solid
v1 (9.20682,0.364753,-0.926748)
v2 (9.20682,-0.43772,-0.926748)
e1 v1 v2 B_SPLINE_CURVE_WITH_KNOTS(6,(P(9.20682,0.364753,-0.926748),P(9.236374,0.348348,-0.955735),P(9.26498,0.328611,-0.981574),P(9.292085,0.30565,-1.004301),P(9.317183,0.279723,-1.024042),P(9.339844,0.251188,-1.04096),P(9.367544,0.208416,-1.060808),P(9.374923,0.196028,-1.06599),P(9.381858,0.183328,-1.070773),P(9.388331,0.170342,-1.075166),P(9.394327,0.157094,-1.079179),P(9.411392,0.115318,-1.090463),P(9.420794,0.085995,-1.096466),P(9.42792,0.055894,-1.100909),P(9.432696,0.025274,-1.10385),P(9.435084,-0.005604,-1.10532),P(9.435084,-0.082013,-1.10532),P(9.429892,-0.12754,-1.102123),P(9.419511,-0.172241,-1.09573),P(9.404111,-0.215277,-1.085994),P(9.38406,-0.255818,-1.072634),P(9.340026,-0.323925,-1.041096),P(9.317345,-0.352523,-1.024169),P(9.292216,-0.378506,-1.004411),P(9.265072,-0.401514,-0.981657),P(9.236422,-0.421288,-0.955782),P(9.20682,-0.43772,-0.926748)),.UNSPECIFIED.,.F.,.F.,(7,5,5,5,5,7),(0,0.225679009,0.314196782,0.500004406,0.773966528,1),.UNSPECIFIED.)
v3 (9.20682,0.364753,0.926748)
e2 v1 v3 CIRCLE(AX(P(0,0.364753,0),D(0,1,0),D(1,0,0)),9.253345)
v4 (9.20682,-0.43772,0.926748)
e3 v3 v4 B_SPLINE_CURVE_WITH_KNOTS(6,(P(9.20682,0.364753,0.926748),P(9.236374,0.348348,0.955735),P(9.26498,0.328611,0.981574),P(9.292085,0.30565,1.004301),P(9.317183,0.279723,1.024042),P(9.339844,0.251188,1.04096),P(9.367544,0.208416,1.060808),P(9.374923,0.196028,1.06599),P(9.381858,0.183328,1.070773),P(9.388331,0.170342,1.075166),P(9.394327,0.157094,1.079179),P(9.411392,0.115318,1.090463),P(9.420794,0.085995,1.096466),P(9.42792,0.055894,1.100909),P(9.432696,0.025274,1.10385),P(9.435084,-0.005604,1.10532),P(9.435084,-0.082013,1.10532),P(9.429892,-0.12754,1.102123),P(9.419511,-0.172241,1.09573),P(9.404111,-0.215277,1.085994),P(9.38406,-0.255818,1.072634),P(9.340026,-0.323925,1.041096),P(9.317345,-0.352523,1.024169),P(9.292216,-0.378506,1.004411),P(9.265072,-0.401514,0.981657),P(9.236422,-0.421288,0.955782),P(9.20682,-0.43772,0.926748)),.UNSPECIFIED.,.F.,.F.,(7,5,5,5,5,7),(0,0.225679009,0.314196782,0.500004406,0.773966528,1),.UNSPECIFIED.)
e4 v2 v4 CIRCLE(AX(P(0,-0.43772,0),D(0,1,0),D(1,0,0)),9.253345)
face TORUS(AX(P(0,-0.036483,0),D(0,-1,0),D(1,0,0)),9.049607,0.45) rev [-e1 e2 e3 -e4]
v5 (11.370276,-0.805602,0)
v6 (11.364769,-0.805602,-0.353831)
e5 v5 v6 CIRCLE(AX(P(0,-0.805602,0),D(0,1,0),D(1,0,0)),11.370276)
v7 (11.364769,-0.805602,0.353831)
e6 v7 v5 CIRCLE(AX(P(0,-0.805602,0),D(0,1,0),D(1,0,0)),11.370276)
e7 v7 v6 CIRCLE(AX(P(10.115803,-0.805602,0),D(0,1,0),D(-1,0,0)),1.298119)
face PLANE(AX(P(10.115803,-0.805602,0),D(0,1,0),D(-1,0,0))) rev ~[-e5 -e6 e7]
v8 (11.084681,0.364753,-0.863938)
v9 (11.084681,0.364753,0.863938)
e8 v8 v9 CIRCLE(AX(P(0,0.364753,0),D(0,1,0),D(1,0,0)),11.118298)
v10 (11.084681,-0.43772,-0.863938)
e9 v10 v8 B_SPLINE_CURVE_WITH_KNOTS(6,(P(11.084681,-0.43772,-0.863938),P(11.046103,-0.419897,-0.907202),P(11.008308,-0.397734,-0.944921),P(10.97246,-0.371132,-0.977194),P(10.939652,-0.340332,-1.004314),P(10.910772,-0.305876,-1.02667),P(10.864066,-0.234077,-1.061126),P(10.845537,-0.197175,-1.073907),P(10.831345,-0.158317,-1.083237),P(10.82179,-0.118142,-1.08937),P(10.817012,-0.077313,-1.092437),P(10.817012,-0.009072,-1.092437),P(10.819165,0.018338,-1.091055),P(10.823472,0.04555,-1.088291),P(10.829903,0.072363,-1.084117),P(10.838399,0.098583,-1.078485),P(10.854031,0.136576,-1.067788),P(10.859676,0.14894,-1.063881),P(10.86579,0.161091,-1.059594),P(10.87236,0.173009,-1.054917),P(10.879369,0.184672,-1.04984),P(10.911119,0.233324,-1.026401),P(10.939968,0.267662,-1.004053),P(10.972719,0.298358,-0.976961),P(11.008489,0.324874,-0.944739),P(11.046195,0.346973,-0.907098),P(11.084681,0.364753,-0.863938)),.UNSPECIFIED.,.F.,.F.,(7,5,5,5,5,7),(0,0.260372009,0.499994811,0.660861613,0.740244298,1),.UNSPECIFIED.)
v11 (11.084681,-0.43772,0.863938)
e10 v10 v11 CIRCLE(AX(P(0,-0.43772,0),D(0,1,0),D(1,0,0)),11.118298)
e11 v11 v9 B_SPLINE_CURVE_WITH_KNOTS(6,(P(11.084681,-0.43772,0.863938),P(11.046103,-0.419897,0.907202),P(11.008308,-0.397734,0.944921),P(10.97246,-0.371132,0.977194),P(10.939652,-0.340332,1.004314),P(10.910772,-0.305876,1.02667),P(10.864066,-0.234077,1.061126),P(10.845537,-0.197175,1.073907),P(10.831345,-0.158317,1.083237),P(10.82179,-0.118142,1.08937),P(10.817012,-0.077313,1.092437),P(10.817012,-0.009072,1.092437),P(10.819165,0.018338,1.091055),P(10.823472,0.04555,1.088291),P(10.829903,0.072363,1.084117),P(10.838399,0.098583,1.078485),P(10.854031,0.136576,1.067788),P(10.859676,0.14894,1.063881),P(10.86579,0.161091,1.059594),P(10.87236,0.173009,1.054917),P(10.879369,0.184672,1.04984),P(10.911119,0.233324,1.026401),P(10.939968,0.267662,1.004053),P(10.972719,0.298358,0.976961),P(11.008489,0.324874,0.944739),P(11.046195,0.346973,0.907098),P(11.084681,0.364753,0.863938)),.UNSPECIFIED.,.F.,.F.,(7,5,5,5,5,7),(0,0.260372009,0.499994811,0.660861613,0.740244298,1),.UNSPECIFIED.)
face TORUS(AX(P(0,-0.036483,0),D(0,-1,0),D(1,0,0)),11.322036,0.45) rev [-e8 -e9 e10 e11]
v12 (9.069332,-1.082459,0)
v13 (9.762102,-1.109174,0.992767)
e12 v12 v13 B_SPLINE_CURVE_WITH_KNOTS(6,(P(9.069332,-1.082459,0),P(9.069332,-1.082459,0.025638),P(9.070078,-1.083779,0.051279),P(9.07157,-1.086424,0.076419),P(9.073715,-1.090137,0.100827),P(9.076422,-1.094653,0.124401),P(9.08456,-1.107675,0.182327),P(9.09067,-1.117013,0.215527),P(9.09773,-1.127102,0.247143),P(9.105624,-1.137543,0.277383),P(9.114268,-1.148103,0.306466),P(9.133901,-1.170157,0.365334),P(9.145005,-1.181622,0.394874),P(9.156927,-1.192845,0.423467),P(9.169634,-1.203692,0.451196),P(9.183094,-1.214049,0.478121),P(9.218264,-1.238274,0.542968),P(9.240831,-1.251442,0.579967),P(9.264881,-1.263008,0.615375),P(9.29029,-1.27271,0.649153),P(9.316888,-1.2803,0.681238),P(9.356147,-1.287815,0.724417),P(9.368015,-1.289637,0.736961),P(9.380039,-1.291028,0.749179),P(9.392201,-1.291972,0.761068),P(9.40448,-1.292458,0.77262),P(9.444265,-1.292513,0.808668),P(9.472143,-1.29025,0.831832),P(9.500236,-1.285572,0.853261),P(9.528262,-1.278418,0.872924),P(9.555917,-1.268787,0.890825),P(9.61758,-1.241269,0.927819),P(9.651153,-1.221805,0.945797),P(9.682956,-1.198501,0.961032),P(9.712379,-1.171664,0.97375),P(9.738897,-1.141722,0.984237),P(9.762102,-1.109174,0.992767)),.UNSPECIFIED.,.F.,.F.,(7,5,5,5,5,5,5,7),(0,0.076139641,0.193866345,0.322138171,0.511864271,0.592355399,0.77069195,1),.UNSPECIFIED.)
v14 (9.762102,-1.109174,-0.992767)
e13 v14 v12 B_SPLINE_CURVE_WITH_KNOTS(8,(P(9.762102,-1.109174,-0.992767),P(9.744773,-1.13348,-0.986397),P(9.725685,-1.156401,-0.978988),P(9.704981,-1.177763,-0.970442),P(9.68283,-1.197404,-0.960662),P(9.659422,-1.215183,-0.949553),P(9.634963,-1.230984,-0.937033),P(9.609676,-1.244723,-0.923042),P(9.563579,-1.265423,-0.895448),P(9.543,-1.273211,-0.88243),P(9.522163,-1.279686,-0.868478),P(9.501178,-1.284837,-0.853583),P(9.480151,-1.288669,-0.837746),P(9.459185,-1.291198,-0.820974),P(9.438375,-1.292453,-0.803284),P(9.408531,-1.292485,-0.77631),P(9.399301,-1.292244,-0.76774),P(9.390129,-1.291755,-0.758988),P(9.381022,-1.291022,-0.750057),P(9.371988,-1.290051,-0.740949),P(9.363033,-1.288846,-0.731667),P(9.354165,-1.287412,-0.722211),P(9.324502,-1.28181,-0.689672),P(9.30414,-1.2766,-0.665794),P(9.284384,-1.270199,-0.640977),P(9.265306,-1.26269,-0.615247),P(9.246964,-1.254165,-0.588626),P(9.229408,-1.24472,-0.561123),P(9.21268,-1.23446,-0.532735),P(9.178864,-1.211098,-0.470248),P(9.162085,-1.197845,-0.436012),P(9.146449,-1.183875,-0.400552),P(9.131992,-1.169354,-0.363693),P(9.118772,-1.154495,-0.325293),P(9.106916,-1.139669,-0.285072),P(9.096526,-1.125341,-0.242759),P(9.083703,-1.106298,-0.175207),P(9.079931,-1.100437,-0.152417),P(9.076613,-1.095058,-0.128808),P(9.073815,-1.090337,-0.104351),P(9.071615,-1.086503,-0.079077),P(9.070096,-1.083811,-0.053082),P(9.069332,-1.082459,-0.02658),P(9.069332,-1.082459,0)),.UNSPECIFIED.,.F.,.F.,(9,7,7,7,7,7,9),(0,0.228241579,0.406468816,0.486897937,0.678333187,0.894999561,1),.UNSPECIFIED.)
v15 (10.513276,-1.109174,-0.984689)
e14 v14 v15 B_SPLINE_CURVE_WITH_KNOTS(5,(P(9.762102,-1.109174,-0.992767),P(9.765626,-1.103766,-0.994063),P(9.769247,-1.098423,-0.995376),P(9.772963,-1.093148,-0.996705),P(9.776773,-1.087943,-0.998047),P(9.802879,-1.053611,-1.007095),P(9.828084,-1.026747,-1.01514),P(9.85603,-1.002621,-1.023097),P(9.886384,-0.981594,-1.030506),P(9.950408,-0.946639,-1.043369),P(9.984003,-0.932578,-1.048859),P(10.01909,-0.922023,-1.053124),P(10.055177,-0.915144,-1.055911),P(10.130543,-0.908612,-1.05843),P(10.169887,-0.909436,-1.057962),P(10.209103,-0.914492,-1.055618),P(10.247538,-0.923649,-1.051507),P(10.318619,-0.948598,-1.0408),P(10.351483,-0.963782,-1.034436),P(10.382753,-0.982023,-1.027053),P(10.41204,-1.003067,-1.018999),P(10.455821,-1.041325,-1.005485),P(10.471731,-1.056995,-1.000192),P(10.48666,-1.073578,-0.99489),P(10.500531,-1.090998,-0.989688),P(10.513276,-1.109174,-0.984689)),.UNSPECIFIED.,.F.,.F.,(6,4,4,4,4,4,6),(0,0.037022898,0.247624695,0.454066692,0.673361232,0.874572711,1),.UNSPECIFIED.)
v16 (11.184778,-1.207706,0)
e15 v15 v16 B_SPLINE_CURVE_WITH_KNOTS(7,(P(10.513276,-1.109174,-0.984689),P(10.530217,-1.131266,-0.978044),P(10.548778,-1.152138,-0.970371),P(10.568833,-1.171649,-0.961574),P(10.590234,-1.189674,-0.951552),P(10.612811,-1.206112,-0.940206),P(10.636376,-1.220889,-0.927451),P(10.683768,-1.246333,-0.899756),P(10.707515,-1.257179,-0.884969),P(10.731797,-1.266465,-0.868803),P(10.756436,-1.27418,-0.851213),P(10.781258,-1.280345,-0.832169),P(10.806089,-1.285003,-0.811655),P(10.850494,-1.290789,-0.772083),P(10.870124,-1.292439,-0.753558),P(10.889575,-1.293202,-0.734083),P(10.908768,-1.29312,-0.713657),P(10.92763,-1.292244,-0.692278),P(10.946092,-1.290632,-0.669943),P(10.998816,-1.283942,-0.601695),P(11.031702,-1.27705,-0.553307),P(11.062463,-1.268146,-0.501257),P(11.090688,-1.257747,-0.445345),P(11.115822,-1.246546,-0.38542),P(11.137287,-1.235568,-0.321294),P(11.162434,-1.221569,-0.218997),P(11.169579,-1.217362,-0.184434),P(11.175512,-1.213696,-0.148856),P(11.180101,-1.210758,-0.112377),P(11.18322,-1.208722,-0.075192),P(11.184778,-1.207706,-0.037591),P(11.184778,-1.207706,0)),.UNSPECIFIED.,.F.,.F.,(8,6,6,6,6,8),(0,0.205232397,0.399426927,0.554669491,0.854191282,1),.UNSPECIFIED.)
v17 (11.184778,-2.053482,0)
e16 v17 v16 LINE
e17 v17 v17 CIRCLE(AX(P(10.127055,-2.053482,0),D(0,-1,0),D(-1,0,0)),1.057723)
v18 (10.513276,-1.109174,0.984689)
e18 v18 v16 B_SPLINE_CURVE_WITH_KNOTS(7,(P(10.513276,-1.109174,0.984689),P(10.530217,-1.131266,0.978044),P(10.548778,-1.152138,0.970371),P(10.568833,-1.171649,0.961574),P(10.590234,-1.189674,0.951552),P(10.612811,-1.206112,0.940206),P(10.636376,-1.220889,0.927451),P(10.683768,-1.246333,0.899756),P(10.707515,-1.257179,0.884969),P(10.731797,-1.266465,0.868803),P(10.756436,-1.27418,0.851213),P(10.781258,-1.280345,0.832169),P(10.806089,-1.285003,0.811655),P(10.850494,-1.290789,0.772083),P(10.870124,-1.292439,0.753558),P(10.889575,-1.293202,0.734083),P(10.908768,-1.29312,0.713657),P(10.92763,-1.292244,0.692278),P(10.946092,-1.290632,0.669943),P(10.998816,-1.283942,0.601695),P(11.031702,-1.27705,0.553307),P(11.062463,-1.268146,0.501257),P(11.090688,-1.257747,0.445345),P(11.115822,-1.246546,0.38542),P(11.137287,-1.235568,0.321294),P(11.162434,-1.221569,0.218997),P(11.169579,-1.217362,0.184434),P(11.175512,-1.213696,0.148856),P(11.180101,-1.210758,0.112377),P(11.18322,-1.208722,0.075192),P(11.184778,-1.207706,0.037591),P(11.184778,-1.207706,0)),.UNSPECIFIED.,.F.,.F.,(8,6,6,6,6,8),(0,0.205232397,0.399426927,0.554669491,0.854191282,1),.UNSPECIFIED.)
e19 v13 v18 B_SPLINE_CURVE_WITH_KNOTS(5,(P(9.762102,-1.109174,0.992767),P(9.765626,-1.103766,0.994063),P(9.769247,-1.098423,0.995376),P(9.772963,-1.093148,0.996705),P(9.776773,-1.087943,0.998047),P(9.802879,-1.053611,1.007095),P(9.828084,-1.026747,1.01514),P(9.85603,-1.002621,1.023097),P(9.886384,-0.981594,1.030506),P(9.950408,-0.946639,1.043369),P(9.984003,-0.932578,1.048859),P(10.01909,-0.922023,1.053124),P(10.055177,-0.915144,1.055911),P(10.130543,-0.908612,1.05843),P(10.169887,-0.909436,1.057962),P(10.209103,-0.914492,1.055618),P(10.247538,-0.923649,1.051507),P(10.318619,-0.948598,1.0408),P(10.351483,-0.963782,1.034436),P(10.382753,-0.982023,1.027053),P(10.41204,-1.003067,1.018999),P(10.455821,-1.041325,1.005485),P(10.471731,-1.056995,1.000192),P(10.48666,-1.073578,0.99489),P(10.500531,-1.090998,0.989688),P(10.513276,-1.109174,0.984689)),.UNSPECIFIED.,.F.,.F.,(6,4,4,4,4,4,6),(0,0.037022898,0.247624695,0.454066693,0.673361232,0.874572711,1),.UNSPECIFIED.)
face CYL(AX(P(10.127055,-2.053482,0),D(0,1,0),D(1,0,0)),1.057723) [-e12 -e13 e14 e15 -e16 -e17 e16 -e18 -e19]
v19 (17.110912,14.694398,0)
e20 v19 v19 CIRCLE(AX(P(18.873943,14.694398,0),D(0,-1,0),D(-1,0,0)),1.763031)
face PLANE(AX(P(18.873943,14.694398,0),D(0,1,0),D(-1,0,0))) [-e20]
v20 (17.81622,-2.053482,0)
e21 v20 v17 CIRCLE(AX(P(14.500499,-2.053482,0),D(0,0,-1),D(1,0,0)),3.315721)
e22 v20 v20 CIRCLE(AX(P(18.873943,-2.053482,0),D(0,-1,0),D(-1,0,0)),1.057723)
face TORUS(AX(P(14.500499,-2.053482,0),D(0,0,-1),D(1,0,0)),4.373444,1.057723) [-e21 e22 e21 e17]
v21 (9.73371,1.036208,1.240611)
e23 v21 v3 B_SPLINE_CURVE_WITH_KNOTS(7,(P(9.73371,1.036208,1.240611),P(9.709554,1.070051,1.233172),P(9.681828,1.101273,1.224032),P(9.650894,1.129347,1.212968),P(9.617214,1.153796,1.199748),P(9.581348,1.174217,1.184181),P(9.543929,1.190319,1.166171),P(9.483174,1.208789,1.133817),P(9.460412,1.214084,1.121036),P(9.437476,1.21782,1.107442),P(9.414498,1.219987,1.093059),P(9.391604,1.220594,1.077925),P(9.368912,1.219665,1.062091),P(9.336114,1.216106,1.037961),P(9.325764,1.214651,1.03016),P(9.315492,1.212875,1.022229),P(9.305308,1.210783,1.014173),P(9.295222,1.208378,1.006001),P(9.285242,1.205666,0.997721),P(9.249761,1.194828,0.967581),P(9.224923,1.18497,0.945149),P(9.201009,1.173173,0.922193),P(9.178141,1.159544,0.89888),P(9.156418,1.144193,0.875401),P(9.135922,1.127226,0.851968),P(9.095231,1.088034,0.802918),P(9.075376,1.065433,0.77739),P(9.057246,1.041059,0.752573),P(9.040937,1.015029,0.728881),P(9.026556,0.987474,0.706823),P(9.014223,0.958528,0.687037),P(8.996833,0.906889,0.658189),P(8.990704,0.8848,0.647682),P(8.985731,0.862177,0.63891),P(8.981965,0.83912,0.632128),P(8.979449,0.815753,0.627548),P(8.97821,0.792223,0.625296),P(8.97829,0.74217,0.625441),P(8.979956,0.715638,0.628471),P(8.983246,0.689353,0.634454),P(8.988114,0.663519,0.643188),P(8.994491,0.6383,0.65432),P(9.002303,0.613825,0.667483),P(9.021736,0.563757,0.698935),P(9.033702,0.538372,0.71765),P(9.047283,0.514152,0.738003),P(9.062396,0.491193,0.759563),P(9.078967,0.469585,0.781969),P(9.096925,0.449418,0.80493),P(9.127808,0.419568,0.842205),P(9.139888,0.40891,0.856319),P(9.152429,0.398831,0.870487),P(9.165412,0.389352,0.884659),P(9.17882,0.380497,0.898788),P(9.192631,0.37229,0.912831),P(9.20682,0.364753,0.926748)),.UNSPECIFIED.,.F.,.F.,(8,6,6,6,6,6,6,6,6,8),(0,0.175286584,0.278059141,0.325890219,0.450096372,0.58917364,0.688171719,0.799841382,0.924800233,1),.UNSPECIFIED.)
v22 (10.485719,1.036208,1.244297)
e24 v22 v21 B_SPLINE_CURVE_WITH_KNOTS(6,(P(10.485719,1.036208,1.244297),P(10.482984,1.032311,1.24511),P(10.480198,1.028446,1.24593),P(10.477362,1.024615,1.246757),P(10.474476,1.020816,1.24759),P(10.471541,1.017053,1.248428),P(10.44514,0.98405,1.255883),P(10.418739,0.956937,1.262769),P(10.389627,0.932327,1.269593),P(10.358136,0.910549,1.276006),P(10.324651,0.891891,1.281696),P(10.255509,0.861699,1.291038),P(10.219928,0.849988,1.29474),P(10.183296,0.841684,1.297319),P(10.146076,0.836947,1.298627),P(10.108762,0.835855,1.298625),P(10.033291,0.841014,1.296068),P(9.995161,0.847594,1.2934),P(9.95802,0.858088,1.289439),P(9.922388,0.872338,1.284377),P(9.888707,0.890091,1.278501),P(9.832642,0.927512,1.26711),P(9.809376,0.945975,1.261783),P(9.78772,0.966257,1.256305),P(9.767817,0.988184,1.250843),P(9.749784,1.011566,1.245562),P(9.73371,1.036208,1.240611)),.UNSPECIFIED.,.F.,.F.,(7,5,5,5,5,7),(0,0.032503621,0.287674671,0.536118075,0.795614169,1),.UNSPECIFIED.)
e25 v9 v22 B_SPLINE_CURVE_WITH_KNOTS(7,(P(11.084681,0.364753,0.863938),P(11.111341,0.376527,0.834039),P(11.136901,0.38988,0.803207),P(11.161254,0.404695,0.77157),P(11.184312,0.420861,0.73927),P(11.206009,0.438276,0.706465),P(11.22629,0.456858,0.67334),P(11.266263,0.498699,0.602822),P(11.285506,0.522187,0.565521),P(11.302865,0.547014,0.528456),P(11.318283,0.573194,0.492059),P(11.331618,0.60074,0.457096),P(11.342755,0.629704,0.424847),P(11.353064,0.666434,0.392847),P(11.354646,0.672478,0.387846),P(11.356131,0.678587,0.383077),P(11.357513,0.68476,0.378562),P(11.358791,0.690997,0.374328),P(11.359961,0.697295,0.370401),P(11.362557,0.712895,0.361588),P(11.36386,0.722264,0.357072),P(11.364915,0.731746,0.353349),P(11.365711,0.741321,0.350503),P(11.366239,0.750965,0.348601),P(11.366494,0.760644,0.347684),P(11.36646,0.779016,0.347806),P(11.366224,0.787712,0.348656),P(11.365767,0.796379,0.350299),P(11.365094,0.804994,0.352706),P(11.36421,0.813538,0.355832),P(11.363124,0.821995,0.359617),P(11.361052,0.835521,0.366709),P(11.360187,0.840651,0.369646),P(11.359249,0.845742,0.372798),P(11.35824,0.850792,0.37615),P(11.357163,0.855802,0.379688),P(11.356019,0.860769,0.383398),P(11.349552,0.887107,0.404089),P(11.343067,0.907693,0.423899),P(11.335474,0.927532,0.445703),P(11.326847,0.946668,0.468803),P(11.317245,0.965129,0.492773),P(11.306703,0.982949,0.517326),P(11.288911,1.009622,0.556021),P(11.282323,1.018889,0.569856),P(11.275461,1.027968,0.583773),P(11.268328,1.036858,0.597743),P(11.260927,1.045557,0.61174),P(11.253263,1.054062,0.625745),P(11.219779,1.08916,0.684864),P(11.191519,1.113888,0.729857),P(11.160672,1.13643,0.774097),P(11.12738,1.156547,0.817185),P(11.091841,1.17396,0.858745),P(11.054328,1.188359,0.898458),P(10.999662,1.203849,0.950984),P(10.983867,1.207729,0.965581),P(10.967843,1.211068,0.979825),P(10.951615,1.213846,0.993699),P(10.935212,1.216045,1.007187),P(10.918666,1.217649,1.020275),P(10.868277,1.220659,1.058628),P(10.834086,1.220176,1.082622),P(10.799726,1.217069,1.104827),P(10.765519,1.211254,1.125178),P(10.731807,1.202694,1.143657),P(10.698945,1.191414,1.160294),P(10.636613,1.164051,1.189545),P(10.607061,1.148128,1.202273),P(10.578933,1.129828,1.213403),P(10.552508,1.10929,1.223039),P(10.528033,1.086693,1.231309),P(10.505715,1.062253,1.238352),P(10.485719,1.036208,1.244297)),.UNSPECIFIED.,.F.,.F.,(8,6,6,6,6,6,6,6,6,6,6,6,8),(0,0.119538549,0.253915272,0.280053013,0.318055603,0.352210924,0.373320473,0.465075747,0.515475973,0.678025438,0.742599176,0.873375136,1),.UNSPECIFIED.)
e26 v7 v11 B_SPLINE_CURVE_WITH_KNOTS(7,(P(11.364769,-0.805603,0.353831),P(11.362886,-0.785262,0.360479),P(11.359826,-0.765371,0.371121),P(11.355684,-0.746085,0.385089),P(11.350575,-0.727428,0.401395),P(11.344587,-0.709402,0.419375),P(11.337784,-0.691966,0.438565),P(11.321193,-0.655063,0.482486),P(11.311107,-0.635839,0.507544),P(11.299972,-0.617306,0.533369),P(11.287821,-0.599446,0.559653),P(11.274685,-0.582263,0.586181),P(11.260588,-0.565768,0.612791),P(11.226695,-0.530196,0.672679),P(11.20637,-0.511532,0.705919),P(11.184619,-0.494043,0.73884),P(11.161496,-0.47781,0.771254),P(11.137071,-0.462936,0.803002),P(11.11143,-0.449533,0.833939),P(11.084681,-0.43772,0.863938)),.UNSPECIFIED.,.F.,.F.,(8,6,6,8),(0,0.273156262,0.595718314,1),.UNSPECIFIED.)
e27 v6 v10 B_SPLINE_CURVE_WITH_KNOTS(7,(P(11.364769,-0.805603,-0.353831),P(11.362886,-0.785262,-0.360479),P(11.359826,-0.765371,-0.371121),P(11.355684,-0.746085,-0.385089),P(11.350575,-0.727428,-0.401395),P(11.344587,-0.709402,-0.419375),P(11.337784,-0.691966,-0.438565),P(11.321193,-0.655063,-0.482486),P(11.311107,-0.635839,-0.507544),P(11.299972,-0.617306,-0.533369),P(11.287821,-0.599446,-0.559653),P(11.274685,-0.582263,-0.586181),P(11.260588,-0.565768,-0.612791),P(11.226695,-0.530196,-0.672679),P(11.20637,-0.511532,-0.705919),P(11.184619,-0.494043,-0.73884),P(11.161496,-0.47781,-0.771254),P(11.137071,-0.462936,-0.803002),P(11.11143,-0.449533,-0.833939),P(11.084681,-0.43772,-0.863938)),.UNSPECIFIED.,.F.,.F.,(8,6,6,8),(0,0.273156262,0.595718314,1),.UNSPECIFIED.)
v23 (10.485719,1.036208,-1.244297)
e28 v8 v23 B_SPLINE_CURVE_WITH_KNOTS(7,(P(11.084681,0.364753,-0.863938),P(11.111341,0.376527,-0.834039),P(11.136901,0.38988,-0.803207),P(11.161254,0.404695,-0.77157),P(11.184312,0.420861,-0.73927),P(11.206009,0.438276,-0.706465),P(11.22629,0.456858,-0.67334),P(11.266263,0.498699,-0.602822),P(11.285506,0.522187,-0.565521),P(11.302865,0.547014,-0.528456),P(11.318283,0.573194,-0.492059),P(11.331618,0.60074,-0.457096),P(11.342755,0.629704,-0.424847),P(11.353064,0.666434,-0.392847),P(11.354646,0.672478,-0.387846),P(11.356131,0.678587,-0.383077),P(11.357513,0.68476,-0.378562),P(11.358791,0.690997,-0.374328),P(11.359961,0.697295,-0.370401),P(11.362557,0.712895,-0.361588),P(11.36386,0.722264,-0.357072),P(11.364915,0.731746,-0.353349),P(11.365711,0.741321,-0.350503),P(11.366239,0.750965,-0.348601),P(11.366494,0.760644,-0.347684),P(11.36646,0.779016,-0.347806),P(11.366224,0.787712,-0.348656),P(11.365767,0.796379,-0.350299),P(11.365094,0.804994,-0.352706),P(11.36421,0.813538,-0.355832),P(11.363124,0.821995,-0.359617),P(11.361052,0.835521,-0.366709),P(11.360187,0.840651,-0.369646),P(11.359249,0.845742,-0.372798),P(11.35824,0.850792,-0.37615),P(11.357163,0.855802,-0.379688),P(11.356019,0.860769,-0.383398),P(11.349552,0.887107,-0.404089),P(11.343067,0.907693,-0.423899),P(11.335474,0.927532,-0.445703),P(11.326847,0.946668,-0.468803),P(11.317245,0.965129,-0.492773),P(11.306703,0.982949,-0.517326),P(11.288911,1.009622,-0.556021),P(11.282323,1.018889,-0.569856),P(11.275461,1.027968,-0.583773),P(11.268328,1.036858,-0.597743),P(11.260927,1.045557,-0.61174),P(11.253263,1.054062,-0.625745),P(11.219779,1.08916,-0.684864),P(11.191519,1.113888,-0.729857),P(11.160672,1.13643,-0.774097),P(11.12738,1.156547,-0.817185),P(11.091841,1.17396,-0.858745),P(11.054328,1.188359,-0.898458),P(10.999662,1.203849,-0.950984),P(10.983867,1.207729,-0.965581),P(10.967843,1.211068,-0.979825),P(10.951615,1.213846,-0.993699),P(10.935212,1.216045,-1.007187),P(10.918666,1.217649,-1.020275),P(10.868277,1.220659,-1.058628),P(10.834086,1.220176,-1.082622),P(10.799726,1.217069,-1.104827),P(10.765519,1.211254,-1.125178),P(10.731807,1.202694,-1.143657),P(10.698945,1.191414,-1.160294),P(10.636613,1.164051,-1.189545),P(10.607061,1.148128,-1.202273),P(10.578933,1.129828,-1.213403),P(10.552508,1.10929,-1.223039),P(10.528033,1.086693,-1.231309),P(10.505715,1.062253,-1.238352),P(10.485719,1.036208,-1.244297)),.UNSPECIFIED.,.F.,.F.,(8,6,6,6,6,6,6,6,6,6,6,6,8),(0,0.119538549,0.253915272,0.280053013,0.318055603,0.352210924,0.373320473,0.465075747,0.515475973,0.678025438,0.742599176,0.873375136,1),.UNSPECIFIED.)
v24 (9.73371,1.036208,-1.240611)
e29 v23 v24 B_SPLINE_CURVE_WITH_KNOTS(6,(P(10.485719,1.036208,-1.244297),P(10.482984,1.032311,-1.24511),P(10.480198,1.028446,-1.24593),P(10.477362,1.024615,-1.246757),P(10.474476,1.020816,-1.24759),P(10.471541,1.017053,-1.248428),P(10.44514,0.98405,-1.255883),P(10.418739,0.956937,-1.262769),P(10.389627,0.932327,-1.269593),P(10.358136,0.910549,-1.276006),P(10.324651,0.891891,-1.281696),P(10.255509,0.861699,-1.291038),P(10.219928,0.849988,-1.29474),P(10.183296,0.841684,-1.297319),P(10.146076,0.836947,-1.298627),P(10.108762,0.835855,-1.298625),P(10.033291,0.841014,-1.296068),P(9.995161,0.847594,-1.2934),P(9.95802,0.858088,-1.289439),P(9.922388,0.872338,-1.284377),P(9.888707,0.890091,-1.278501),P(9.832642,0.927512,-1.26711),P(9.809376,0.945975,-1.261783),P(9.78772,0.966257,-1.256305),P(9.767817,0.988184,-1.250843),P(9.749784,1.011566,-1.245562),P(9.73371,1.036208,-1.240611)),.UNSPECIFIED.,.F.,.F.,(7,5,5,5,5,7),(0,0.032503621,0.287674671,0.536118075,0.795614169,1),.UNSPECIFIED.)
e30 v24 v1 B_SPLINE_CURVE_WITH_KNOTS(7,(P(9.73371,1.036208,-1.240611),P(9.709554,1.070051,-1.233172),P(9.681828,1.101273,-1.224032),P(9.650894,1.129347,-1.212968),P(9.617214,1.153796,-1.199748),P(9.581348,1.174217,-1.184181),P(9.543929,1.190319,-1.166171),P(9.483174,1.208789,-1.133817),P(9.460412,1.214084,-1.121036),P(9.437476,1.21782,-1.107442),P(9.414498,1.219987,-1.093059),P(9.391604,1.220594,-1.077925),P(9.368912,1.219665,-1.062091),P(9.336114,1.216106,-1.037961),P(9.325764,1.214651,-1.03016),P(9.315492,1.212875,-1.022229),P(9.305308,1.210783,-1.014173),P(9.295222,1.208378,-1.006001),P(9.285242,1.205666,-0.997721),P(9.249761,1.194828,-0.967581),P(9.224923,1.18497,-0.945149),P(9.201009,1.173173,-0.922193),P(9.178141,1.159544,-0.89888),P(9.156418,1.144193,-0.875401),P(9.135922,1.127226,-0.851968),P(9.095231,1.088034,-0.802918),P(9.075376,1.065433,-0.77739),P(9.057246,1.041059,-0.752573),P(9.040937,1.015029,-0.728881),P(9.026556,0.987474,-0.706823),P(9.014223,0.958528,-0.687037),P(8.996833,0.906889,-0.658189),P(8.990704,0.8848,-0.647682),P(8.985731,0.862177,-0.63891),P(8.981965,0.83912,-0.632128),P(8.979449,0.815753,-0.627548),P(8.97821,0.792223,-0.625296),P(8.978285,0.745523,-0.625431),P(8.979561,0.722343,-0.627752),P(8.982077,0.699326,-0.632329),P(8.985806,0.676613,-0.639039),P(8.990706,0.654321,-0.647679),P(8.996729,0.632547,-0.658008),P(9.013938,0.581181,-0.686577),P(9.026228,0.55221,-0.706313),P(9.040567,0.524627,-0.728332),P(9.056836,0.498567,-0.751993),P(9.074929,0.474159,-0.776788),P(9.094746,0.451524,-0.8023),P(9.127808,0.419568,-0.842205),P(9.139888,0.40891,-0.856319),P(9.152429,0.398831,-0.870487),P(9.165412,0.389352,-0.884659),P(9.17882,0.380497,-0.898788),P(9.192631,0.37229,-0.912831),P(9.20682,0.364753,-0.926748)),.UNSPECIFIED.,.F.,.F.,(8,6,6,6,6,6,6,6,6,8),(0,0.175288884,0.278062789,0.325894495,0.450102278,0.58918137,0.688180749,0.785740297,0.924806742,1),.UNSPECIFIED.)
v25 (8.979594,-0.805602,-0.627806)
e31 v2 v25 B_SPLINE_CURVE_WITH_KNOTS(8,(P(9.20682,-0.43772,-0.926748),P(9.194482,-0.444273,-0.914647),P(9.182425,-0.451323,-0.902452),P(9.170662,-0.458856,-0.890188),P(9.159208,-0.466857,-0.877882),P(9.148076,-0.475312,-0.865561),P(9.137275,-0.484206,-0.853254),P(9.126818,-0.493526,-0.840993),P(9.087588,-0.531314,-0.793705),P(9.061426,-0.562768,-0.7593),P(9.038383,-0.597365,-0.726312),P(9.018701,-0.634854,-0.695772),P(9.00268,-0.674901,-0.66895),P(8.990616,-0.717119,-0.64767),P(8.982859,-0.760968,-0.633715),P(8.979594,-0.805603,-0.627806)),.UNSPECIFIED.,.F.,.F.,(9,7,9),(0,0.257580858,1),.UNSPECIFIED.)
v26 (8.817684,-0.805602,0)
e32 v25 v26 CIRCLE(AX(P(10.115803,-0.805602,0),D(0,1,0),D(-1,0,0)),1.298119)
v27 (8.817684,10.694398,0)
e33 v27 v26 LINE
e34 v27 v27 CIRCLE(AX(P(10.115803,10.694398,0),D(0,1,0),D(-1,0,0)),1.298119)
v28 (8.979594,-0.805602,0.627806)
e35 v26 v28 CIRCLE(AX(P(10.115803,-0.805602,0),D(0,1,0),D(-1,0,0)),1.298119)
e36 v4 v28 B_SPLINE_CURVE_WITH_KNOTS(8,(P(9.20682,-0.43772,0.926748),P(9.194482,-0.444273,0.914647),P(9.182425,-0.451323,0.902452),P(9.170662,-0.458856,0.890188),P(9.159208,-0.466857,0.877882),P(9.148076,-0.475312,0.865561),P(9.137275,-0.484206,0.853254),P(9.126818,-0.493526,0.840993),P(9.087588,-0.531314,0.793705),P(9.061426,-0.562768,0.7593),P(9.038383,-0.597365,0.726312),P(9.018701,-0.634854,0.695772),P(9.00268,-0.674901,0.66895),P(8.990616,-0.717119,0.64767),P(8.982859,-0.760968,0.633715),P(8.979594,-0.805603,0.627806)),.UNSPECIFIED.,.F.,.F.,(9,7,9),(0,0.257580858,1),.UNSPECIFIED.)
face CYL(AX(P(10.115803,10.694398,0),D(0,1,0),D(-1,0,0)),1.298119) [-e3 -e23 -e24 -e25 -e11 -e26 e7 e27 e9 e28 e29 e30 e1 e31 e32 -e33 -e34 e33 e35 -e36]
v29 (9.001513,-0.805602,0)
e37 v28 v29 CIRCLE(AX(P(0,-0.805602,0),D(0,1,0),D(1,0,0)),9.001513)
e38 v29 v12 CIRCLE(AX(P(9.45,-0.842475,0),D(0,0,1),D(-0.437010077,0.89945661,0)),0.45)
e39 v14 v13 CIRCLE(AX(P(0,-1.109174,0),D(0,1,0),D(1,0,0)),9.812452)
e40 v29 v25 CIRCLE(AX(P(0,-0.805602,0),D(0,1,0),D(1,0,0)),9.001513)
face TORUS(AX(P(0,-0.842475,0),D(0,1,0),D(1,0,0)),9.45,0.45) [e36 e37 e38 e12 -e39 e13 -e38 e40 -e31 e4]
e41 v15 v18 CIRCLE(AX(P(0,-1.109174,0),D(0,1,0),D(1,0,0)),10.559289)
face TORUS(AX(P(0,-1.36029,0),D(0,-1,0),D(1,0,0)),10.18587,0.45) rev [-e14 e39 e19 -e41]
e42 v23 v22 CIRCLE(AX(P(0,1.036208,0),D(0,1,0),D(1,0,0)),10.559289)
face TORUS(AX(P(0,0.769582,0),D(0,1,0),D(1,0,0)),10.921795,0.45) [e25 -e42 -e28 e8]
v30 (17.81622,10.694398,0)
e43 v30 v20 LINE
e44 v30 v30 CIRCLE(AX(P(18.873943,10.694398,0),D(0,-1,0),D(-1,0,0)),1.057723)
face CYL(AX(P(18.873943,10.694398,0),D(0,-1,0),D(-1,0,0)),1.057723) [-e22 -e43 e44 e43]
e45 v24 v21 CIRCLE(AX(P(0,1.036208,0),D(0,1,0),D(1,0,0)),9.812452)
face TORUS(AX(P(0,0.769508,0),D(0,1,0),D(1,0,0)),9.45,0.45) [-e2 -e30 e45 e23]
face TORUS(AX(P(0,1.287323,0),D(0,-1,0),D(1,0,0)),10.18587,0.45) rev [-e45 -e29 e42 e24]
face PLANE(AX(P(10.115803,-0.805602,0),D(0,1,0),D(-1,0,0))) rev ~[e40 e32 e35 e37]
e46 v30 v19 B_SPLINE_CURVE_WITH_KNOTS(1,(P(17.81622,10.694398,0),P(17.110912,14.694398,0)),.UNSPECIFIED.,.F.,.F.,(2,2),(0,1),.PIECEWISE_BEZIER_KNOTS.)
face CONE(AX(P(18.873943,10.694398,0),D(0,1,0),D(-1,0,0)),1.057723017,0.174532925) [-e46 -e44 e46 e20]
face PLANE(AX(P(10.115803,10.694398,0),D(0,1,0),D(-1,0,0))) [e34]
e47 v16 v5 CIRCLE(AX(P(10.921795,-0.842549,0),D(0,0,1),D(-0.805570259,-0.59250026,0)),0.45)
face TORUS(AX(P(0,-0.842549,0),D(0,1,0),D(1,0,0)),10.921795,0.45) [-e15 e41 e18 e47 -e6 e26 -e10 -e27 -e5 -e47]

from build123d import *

# Parameters (mm, degrees)
F4_R      = 1.0577230165
F5_FACE_R = 1.0577230165
F6_DEPTH  = 4
F6_TAPER  = -10
F7_R      = 1.2981187366
F8_DEPTH  = 11.5


# Not quite as in the source:
# - a feature names something its author has since deleted; it is built from what else it names


with BuildPart() as f1:
    # F0 (on Top) → F1 (revolve)
    with BuildSketch(Plane.XY):
        with BuildLine():
            ThreePointArc((10.5592885973, 1.0362075193), (10.1858704224, 0.8373227652), (9.8124522476, 1.0362075193))
            ThreePointArc((9.8124522476, 1.0362075193), (9.1041893503, 1.0574581364), (9.2533454653, 0.3647530232))
            ThreePointArc((9.2533454653, 0.3647530232), (9.4996070634, -0.0364833953), (9.2533454653, -0.4377198139))
            ThreePointArc((9.2533454653, -0.4377198139), (9.1041893503, -1.1304249271), (9.8124522476, -1.1091743099))
            ThreePointArc((9.8124522476, -1.1091743099), (10.1858704224, -0.9102895558), (10.5592885973, -1.1091743099))
            ThreePointArc((10.5592885973, -1.1091743099), (11.2676306359, -1.1304690792), (11.1182975643, -0.4377198139))
            ThreePointArc((11.1182975643, -0.4377198139), (10.8720359662, -0.0364833953), (11.1182975643, 0.3647530232))
            ThreePointArc((11.1182975643, 0.3647530232), (11.2676306359, 1.0575022886), (10.5592885973, 1.0362075193))
        make_face()
    revolve(axis=Axis((0, 2.4106169393, 0), (0, 1, 0)))

    # F5: sweep along a path in F2
    with BuildLine(Plane.XY) as f5_path:
        Line((18.8743826002, 10.6943976134), (18.8743826002, -2.0534822252))
        ThreePointArc((18.8743826002, -2.0534822252), (14.5004992373, -6.427365588), (10.1266158745, -2.0534822252))
        Line((10.1266158745, -2.0534822252), (10.1266158745, -0.6472322857))
    # F4 (on line) → F5 (sweep)
    with BuildSketch(Plane(origin=(0, 10.6943976134, 0), x_dir=(-1, 0, 0), z_dir=(0, 1, 0))):
        with Locations((-18.8739430159, 0)):
            Circle(F4_R)
    sweep(path=f5_path.line)

    # F5_face (on face) → F6 (join)
    with BuildSketch(Plane(origin=(18.8739430159, 10.6943976134, 0), x_dir=(-1, 0, 0), z_dir=(0, 1, 0))):
        Circle(F5_FACE_R)
    extrude(amount=F6_DEPTH, taper=F6_TAPER)

    # F7 (on line) → F8 (join)
    with BuildSketch(Plane(origin=(0, 10.6943976134, 0), x_dir=(-1, 0, 0), z_dir=(0, 1, 0))):
        with Locations((-10.1158032194, 0)):
            Circle(F7_R)
    extrude(amount=-F8_DEPTH)


solid = f1.part
